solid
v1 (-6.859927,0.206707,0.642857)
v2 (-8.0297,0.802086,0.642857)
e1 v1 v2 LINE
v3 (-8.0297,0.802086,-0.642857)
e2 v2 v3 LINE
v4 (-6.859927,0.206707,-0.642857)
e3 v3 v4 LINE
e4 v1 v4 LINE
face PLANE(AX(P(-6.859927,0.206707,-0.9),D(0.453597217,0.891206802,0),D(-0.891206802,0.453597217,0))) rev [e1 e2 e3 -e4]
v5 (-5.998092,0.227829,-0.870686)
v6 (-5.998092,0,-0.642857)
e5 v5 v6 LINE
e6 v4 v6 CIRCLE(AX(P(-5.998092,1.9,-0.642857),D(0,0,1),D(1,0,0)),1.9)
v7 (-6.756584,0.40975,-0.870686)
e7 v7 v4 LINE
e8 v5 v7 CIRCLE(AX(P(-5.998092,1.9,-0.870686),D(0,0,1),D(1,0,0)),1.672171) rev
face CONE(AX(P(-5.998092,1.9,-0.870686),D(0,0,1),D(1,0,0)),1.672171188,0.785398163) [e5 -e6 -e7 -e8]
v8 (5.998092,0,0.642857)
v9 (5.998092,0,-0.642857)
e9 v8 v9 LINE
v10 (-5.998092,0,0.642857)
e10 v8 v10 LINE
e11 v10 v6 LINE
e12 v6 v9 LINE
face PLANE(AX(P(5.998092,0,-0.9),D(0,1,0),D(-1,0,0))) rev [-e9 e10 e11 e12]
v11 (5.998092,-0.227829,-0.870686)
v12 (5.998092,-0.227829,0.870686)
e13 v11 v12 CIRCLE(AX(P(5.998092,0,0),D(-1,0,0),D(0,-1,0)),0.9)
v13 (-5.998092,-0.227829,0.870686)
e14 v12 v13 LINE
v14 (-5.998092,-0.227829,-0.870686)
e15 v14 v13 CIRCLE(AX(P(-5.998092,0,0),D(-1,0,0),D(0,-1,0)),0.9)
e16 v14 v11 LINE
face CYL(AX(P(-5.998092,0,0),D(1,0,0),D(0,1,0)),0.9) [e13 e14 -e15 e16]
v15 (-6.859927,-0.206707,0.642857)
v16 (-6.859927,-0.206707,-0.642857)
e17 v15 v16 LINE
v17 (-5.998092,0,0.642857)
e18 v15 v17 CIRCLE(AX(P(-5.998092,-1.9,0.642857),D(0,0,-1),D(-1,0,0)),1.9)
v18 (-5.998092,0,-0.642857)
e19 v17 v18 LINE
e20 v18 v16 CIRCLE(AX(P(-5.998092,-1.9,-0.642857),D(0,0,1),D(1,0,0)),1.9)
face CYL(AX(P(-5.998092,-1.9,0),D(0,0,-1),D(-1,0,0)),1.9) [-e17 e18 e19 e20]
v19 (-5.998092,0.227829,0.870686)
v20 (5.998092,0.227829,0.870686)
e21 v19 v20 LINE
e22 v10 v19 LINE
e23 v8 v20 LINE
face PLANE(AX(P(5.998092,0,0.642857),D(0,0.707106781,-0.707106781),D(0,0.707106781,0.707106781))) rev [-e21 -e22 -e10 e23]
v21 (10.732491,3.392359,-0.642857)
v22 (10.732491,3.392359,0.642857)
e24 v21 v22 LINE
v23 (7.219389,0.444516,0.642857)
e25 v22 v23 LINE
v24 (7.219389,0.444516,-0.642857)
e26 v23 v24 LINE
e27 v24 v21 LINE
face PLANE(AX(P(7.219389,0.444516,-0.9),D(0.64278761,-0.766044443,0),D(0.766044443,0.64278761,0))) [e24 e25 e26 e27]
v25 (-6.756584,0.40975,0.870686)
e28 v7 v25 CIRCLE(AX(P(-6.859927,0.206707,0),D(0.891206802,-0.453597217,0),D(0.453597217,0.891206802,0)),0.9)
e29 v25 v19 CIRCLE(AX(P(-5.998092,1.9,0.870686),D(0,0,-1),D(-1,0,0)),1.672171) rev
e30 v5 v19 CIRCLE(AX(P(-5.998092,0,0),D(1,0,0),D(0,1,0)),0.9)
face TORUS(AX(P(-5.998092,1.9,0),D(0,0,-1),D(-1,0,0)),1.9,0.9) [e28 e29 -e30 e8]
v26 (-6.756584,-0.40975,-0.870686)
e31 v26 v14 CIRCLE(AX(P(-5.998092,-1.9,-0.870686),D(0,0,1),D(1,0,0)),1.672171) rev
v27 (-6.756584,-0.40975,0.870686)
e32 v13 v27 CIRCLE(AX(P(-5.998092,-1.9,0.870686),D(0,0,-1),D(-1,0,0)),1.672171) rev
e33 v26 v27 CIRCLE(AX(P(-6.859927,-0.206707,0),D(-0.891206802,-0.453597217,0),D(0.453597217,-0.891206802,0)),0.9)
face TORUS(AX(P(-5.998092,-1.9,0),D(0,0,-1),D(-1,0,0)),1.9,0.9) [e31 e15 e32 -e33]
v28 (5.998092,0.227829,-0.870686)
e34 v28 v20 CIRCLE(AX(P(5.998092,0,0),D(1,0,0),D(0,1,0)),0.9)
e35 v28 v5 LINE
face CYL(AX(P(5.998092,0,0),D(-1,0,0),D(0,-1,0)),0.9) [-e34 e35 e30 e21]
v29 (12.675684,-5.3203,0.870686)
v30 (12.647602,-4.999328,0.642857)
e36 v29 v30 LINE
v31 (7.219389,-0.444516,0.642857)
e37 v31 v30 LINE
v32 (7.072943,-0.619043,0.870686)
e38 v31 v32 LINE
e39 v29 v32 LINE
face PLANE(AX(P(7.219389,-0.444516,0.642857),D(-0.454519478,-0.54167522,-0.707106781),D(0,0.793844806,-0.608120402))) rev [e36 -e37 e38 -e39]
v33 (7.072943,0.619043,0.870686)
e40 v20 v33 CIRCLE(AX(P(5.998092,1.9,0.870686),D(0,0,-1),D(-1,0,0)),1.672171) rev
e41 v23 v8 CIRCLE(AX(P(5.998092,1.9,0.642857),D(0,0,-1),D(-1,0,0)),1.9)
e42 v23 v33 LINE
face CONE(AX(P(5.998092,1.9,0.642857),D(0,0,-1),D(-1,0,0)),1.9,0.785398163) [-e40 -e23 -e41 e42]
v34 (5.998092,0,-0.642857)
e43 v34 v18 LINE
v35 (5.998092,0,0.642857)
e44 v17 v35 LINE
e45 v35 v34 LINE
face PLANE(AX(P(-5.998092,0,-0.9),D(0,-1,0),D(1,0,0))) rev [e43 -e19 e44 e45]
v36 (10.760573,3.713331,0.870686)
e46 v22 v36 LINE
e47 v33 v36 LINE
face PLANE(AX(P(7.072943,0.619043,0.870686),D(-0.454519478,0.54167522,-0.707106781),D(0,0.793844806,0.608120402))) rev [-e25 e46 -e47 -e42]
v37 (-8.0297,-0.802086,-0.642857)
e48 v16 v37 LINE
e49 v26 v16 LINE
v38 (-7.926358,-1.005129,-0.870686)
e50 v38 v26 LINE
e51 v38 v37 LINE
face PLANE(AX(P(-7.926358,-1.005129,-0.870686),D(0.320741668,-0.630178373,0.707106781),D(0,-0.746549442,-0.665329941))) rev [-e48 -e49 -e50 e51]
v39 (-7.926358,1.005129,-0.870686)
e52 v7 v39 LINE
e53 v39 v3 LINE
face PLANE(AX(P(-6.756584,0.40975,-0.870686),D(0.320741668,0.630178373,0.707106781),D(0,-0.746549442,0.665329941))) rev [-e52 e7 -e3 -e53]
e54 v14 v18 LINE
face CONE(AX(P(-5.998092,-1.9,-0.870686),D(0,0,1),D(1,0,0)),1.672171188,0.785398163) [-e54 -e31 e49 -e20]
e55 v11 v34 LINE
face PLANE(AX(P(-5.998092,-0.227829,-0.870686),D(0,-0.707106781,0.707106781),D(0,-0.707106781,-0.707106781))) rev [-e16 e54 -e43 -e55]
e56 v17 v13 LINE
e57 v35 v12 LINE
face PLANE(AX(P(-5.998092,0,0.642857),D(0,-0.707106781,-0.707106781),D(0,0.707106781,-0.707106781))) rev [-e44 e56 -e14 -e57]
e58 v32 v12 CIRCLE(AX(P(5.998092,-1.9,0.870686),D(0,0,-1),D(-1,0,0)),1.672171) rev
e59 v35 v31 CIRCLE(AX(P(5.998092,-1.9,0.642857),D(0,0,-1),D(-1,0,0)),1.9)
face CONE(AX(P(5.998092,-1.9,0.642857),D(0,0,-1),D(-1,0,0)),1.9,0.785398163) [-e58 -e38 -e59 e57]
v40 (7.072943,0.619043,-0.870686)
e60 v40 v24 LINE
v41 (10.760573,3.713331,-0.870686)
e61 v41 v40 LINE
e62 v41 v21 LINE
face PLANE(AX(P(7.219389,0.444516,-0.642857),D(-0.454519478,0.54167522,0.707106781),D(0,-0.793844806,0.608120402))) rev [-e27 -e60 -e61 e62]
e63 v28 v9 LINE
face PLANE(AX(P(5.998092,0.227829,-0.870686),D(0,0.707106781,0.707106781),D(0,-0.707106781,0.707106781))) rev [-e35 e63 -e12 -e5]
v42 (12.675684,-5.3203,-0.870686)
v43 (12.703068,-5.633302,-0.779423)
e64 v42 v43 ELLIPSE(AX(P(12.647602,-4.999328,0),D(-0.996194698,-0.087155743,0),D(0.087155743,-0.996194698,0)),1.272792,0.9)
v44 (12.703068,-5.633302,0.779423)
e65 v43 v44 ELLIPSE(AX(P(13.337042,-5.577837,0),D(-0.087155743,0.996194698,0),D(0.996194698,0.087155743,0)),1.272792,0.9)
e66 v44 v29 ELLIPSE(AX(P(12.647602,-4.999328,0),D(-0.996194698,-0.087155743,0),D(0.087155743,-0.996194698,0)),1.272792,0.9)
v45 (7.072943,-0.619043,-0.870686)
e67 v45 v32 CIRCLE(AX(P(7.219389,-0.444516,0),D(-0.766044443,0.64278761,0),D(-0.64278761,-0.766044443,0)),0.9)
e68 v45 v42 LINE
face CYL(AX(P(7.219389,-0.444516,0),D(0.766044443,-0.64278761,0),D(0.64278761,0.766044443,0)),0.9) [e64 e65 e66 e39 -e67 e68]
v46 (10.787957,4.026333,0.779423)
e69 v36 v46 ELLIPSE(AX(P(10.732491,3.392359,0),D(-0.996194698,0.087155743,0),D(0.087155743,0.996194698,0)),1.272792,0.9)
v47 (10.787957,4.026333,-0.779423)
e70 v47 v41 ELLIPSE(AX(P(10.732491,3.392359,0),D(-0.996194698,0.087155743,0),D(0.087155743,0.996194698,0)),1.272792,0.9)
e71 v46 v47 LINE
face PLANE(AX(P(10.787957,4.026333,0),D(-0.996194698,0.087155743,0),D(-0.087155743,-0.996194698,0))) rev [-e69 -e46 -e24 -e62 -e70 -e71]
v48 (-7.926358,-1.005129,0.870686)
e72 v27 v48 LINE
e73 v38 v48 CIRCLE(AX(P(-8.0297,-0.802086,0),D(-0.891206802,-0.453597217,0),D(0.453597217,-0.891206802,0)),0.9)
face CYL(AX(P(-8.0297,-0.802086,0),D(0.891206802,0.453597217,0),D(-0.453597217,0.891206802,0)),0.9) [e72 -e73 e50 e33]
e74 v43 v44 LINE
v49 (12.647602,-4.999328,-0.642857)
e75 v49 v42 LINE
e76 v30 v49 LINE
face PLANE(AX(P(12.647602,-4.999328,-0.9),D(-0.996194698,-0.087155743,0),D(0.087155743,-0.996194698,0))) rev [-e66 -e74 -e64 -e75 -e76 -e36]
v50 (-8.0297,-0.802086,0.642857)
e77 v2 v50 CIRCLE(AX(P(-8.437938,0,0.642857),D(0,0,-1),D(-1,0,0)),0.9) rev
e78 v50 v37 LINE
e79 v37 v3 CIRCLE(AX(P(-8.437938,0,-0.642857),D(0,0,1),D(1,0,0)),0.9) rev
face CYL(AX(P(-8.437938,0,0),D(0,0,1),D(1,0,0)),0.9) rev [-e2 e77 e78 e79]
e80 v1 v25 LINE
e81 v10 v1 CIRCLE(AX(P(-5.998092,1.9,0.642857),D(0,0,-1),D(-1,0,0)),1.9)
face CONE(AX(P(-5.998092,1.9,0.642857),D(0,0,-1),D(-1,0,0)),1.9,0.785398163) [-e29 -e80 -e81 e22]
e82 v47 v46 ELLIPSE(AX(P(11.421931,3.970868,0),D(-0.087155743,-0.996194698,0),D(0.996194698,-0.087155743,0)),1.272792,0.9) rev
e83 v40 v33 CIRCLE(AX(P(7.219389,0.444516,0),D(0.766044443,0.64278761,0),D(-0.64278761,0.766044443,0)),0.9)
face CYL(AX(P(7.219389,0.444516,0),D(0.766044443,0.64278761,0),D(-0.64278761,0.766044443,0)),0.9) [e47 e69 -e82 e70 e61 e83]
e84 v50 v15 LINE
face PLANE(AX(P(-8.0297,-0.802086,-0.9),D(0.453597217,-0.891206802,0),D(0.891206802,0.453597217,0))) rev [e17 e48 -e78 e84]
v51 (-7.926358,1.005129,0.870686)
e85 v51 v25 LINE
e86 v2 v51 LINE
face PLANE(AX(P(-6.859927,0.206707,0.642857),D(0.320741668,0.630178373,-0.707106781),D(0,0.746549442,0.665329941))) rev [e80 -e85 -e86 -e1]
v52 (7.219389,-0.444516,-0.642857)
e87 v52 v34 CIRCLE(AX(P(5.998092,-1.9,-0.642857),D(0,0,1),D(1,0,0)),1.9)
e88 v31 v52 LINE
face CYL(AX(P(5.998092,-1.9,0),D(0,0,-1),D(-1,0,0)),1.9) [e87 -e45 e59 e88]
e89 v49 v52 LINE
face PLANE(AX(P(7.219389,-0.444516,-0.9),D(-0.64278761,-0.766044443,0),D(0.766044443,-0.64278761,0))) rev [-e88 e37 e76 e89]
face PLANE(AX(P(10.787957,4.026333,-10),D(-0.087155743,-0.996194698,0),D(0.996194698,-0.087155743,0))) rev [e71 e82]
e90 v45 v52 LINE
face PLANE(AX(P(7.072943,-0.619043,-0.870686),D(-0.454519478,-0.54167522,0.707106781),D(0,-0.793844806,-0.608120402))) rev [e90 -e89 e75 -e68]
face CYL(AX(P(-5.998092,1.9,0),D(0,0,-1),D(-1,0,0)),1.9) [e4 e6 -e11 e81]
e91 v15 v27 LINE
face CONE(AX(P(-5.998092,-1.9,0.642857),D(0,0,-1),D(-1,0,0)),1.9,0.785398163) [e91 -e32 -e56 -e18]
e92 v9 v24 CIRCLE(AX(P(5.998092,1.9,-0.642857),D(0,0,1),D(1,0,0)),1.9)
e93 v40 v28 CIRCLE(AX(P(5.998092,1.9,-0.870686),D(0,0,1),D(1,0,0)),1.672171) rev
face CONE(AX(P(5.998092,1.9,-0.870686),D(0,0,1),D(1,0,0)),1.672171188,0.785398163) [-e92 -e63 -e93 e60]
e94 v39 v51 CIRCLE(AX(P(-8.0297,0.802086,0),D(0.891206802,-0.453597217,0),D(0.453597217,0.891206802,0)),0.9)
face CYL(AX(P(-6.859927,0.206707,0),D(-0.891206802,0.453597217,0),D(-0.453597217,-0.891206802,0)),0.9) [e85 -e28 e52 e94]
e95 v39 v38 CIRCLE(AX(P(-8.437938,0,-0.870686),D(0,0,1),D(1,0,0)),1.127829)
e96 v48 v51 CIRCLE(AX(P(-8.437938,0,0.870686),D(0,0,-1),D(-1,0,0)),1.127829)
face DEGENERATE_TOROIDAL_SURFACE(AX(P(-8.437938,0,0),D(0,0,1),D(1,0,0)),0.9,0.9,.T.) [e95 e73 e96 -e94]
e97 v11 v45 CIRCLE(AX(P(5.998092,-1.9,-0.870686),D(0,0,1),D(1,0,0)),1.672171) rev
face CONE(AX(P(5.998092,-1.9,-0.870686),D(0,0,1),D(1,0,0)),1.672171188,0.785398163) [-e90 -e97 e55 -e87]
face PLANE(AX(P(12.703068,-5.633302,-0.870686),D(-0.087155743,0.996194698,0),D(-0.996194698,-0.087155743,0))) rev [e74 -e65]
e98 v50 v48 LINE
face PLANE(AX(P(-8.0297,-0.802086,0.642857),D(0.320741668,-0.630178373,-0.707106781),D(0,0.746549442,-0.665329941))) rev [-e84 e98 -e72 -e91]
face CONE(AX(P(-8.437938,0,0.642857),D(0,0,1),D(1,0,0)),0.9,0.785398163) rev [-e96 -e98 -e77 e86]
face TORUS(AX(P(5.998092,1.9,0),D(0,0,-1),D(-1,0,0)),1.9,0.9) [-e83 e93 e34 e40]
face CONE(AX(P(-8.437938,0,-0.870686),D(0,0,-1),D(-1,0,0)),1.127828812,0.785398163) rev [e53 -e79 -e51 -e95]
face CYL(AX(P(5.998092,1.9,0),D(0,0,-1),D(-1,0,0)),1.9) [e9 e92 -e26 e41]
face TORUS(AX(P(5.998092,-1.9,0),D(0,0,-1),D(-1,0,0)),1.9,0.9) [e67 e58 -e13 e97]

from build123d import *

# Parameters (mm, degrees)
ZKOSIT1_SIZE                  = 0.257142857
ZKOSIT2_SIZE                  = 0.45
ODEBRAT_VYSUNUT_M2_DEPTH      = 10
ODEBRAT_VYSUNUT_M2_DEPTH_BACK = 10
ODEBRAT_VYSUNUT_M3_DEPTH      = 15.066370457
ODEBRAT_VYSUNUT_M3_DEPTH_BACK = 15.066370457


with BuildPart() as part:
    # Táhnout po křivce1: sweep along a path in Skica1
    with BuildLine(Plane.XY) as t_hnout_po_k_ivce1_path:
        Line((10.498702419, 4.371053092), (6.640879802, 1.133955557))
        ThreePointArc((6.640879802, 1.133955557), (6.340112335, 0.960307379), (5.998092192, 0.9))
        Line((5.998092192, 0.9), (-5.998092192, 0.9))
        ThreePointArc((-5.998092192, 0.9), (-6.231322977, 0.927578589), (-6.451689409, 1.008793198))
        Line((-6.451689409, 1.008793198), (-7.621462583, 1.604172244))
        ThreePointArc((-7.621462583, 1.604172244), (-10.237937574, 0), (-7.621462583, -1.604172244))
        Line((-7.621462583, -1.604172244), (-6.451689409, -1.008793198))
        ThreePointArc((-6.451689409, -1.008793198), (-6.231322977, -0.927578589), (-5.998092192, -0.9))
        Line((-5.998092192, -0.9), (5.998092192, -0.9))
        ThreePointArc((5.998092192, -0.9), (6.340112335, -0.960307379), (6.640879802, -1.133955557))
        Line((6.640879802, -1.133955557), (10.498702419, -4.371053092))
        Line((10.498702419, -4.371053092), (12.413813527, -5.978022117))
    # Skica2 → Táhnout po křivce1 (sweep)
    with BuildSketch(Plane(origin=(10.498702419, 4.371053092, 0), x_dir=(0, 0, -1), z_dir=(0.7660444431189762, 0.6427876096865417, 0))):
        with BuildLine():
            Line((0.9, -0.9), (-0.9, -0.9))
            ThreePointArc((-0.9, -0.9), (0, 0), (0.9, -0.9))
        make_face()
    sweep(path=t_hnout_po_k_ivce1_path.line)

    # Zkosit1
    # the kernel refuses this chamfer: 0.257142857 mm, written as the material it takes off along each edge
    with BuildSketch(Plane(origin=(5.998092192, 0, 0.9), x_dir=(0, 0, -1), z_dir=(-1, 0, 0)), Plane(origin=(-5.998092192, 0, 0.9), x_dir=(0, 0, -1), z_dir=(1, 0, 0))) as zkosit1_piece_1:
        with BuildLine():
            Line((ZKOSIT1_SIZE, 0), (0.029314045, -0.227828812))
            ThreePointArc((0.029314045, -0.227828812), (0.007766605, -0.117981219), (0, 0))
            Line((0, 0), (ZKOSIT1_SIZE, 0))
        make_face()
    extrude(amount=11.996184384, mode=Mode.SUBTRACT)
    with BuildSketch(Plane(origin=(5.998092192, 0, -0.9), x_dir=(0, 0, 1), z_dir=(-1, 0, 0)), Plane(origin=(-5.998092192, 0, -0.9), x_dir=(0, 0, 1), z_dir=(1, 0, 0))) as zkosit1_piece_2:
        with BuildLine():
            Line((ZKOSIT1_SIZE, 0), (0.029314045, 0.227828812))
            ThreePointArc((0.029314045, 0.227828812), (0.007766605, 0.117981219), (0, 0))
            Line((0, 0), (ZKOSIT1_SIZE, 0))
        make_face()
    extrude(amount=11.996184384, mode=Mode.SUBTRACT)
    with BuildSketch(Plane(origin=(-5.998092192, 1.9, 0.9), x_dir=(0, -1, 0), z_dir=(1, 0, 0))) as zkosit1_piece_3:
        with BuildLine():
            Line((1.9, ZKOSIT1_SIZE), (1.672171188, 0.029314045))
            ThreePointArc((1.672171188, 0.029314045), (1.782018781, 0.007766605), (1.9, 0))
            Line((1.9, 0), (1.9, ZKOSIT1_SIZE))
        make_face()
    revolve(axis=Axis((-5.998092192, 1.9, 0.9), (0, 0, -1)), revolution_arc=26.974712985, mode=Mode.SUBTRACT)
    with BuildSketch(Plane(origin=(-5.998092192, 1.9, -0.9), x_dir=(0, -1, 0), z_dir=(1, 0, 0))) as zkosit1_piece_4:
        with BuildLine():
            Line((1.9, -ZKOSIT1_SIZE), (1.672171188, -0.029314045))
            ThreePointArc((1.672171188, -0.029314045), (1.782018781, -0.007766605), (1.9, 0))
            Line((1.9, 0), (1.9, -ZKOSIT1_SIZE))
        make_face()
    revolve(axis=Axis((-5.998092192, 1.9, -0.9), (0, 0, -1)), revolution_arc=26.974712985, mode=Mode.SUBTRACT)
    with BuildSketch(Plane(origin=(-6.859926905, 0.206707076, 0.9), x_dir=(0, 0, -1), z_dir=(-0.8912068023322748, 0.4535972172276652, 0)), Plane(origin=(-8.029700078, -0.802086122, 0.9), x_dir=(0, 0, -1), z_dir=(0.8912068023322748, 0.45359721722766544, 0))) as zkosit1_piece_5:
        with BuildLine():
            Line((ZKOSIT1_SIZE, 0), (0.029314045, -0.227828812))
            ThreePointArc((0.029314045, -0.227828812), (0.007766605, -0.117981219), (0, 0))
            Line((0, 0), (ZKOSIT1_SIZE, 0))
        make_face()
    extrude(amount=1.312572088, mode=Mode.SUBTRACT)
    with BuildSketch(Plane(origin=(-6.859926905, 0.206707076, -0.9), x_dir=(0, 0, 1), z_dir=(-0.8912068023322748, 0.4535972172276652, 0)), Plane(origin=(-8.029700078, -0.802086122, -0.9), x_dir=(0, 0, 1), z_dir=(0.8912068023322748, 0.45359721722766544, 0))) as zkosit1_piece_6:
        with BuildLine():
            Line((ZKOSIT1_SIZE, 0), (0.029314045, 0.227828812))
            ThreePointArc((0.029314045, 0.227828812), (0.007766605, 0.117981219), (0, 0))
            Line((0, 0), (ZKOSIT1_SIZE, 0))
        make_face()
    extrude(amount=1.312572088, mode=Mode.SUBTRACT)
    with BuildSketch(Plane(origin=(-8.437937574, 0, 0.9), x_dir=(0.4535972172277306, 0.8912068023322415, 0), z_dir=(0.8912068023322415, -0.4535972172277306, 0))) as zkosit1_piece_7:
        with BuildLine():
            Line((0.9, -ZKOSIT1_SIZE), (1.127828812, -0.029314045))
            ThreePointArc((1.127828812, -0.029314045), (1.017981219, -0.007766605), (0.9, 0))
            Line((0.9, 0), (0.9, -ZKOSIT1_SIZE))
        make_face()
    revolve(axis=Axis((-8.437937574, 0, 0.9), (0, 0, 1)), revolution_arc=233.94942597, mode=Mode.SUBTRACT)
    with BuildSketch(Plane(origin=(-8.437937574, 0, -0.9), x_dir=(0.4535972172277306, 0.8912068023322415, 0), z_dir=(0.8912068023322415, -0.4535972172277306, 0))) as zkosit1_piece_8:
        with BuildLine():
            Line((0.9, ZKOSIT1_SIZE), (1.127828812, 0.029314045))
            ThreePointArc((1.127828812, 0.029314045), (1.017981219, 0.007766605), (0.9, 0))
            Line((0.9, 0), (0.9, ZKOSIT1_SIZE))
        make_face()
    revolve(axis=Axis((-8.437937574, 0, -0.9), (0, 0, 1)), revolution_arc=233.94942597, mode=Mode.SUBTRACT)
    with BuildSketch(Plane(origin=(-5.998092192, -1.9, 0.9), x_dir=(-0.4535972172277067, 0.8912068023322537, 0), z_dir=(-0.8912068023322537, -0.4535972172277067, 0))) as zkosit1_piece_9:
        with BuildLine():
            Line((1.9, ZKOSIT1_SIZE), (1.672171188, 0.029314045))
            ThreePointArc((1.672171188, 0.029314045), (1.782018781, 0.007766605), (1.9, 0))
            Line((1.9, 0), (1.9, ZKOSIT1_SIZE))
        make_face()
    revolve(axis=Axis((-5.998092192, -1.9, 0.9), (0, 0, -1)), revolution_arc=26.974712985, mode=Mode.SUBTRACT)
    with BuildSketch(Plane(origin=(-5.998092192, -1.9, -0.9), x_dir=(-0.4535972172277067, 0.8912068023322537, 0), z_dir=(-0.8912068023322537, -0.4535972172277067, 0))) as zkosit1_piece_10:
        with BuildLine():
            Line((1.9, -ZKOSIT1_SIZE), (1.672171188, -0.029314045))
            ThreePointArc((1.672171188, -0.029314045), (1.782018781, -0.007766605), (1.9, 0))
            Line((1.9, 0), (1.9, -ZKOSIT1_SIZE))
        make_face()
    revolve(axis=Axis((-5.998092192, -1.9, -0.9), (0, 0, -1)), revolution_arc=26.974712985, mode=Mode.SUBTRACT)
    with BuildSketch(Plane(origin=(5.998092192, -1.9, 0.9), x_dir=(0, 1, 0), z_dir=(-1, 0, 0))) as zkosit1_piece_11:
        with BuildLine():
            Line((1.9, ZKOSIT1_SIZE), (1.672171188, 0.029314045))
            ThreePointArc((1.672171188, 0.029314045), (1.782018781, 0.007766605), (1.9, 0))
            Line((1.9, 0), (1.9, ZKOSIT1_SIZE))
        make_face()
    revolve(axis=Axis((5.998092192, -1.9, 0.9), (0, 0, -1)), revolution_arc=40, mode=Mode.SUBTRACT)
    with BuildSketch(Plane(origin=(5.998092192, -1.9, -0.9), x_dir=(0, 1, 0), z_dir=(-1, 0, 0))) as zkosit1_piece_12:
        with BuildLine():
            Line((1.9, -ZKOSIT1_SIZE), (1.672171188, -0.029314045))
            ThreePointArc((1.672171188, -0.029314045), (1.782018781, -0.007766605), (1.9, 0))
            Line((1.9, 0), (1.9, -ZKOSIT1_SIZE))
        make_face()
    revolve(axis=Axis((5.998092192, -1.9, -0.9), (0, 0, -1)), revolution_arc=40, mode=Mode.SUBTRACT)
    with BuildSketch(Plane(origin=(7.21938865, -0.444515558, 0.9), x_dir=(0, 0, -1), z_dir=(0.7660444431189773, -0.6427876096865403, 0)), Plane(origin=(13.498899837, -5.713651079, -0.9), x_dir=(0, 0, 1), z_dir=(-0.7660444431189773, 0.6427876096865401, 0))) as zkosit1_piece_13:
        with BuildLine():
            Line((ZKOSIT1_SIZE, 0), (0.029314045, -0.227828812))
            ThreePointArc((0.029314045, -0.227828812), (0.007766605, -0.117981219), (0, 0))
            Line((0, 0), (ZKOSIT1_SIZE, 0))
        make_face()
    extrude(amount=8.197319677, mode=Mode.SUBTRACT)
    with BuildSketch(Plane(origin=(11.58378873, 4.106682055, -0.9), x_dir=(0, 0, 1), z_dir=(-0.766044443118977, -0.6427876096865406, 0))) as zkosit1_piece_14:
        with BuildLine():
            Line((ZKOSIT1_SIZE, 0), (0.029314045, 0.227828812))
            ThreePointArc((0.029314045, 0.227828812), (0.007766605, 0.117981219), (0, 0))
            Line((0, 0), (ZKOSIT1_SIZE, 0))
        make_face()
    extrude(amount=5.697319677, mode=Mode.SUBTRACT)
    with BuildSketch(Plane(origin=(11.58378873, 4.106682055, 0.9), x_dir=(0, 0, -1), z_dir=(-0.766044443118977, -0.6427876096865406, 0))) as zkosit1_piece_15:
        with BuildLine():
            Line((ZKOSIT1_SIZE, 0), (0.029314045, -0.227828812))
            ThreePointArc((0.029314045, -0.227828812), (0.007766605, -0.117981219), (0, 0))
            Line((0, 0), (ZKOSIT1_SIZE, 0))
        make_face()
    extrude(amount=5.697319677, mode=Mode.SUBTRACT)
    with BuildSketch(Plane(origin=(5.998092192, 1.9, 0.9), x_dir=(0.6427876096865431, -0.7660444431189749, 0), z_dir=(0.7660444431189749, 0.6427876096865431, 0))) as zkosit1_piece_16:
        with BuildLine():
            Line((1.9, ZKOSIT1_SIZE), (1.672171188, 0.029314045))
            ThreePointArc((1.672171188, 0.029314045), (1.782018781, 0.007766605), (1.9, 0))
            Line((1.9, 0), (1.9, ZKOSIT1_SIZE))
        make_face()
    revolve(axis=Axis((5.998092192, 1.9, 0.9), (0, 0, -1)), revolution_arc=40, mode=Mode.SUBTRACT)
    with BuildSketch(Plane(origin=(5.998092192, 1.9, -0.9), x_dir=(0.6427876096865431, -0.7660444431189749, 0), z_dir=(0.7660444431189749, 0.6427876096865431, 0))) as zkosit1_piece_17:
        with BuildLine():
            Line((1.9, -ZKOSIT1_SIZE), (1.672171188, -0.029314045))
            ThreePointArc((1.672171188, -0.029314045), (1.782018781, -0.007766605), (1.9, 0))
            Line((1.9, 0), (1.9, -ZKOSIT1_SIZE))
        make_face()
    revolve(axis=Axis((5.998092192, 1.9, -0.9), (0, 0, -1)), revolution_arc=40, mode=Mode.SUBTRACT)

    # Zkosit2
    zkosit2_edges = [part.edges().sort_by_distance(p)[0] for p in [
        (12.992322376, -5.288582118, 0),
        (11.077211268, 3.681613094, 0),
    ]]
    chamfer(zkosit2_edges, length=ZKOSIT2_SIZE)

    # Skica5 → Odebrat vysunutím2 (cut, two sides: drawn at the far end of the back side and taken through both)
    with BuildSketch(Plane.XY.offset(-ODEBRAT_VYSUNUT_M2_DEPTH_BACK)):
        Polygon((10.787956844, 4.026333093), (10.15398242, 4.081798668), (10.498702419, 4.371053092), align=None)
    extrude(amount=ODEBRAT_VYSUNUT_M2_DEPTH + ODEBRAT_VYSUNUT_M2_DEPTH_BACK, mode=Mode.SUBTRACT)

    # Skica6 → Odebrat vysunutím3 (cut, two sides: drawn at the far end of the back side and taken through both)
    with BuildSketch(Plane.XY.offset(-ODEBRAT_VYSUNUT_M3_DEPTH_BACK)):
        Polygon((12.703067951, -5.633302117), (12.069093528, -5.688767692), (12.413813527, -5.978022117), align=None)
    extrude(amount=ODEBRAT_VYSUNUT_M3_DEPTH + ODEBRAT_VYSUNUT_M3_DEPTH_BACK, mode=Mode.SUBTRACT)


solid = part.part
